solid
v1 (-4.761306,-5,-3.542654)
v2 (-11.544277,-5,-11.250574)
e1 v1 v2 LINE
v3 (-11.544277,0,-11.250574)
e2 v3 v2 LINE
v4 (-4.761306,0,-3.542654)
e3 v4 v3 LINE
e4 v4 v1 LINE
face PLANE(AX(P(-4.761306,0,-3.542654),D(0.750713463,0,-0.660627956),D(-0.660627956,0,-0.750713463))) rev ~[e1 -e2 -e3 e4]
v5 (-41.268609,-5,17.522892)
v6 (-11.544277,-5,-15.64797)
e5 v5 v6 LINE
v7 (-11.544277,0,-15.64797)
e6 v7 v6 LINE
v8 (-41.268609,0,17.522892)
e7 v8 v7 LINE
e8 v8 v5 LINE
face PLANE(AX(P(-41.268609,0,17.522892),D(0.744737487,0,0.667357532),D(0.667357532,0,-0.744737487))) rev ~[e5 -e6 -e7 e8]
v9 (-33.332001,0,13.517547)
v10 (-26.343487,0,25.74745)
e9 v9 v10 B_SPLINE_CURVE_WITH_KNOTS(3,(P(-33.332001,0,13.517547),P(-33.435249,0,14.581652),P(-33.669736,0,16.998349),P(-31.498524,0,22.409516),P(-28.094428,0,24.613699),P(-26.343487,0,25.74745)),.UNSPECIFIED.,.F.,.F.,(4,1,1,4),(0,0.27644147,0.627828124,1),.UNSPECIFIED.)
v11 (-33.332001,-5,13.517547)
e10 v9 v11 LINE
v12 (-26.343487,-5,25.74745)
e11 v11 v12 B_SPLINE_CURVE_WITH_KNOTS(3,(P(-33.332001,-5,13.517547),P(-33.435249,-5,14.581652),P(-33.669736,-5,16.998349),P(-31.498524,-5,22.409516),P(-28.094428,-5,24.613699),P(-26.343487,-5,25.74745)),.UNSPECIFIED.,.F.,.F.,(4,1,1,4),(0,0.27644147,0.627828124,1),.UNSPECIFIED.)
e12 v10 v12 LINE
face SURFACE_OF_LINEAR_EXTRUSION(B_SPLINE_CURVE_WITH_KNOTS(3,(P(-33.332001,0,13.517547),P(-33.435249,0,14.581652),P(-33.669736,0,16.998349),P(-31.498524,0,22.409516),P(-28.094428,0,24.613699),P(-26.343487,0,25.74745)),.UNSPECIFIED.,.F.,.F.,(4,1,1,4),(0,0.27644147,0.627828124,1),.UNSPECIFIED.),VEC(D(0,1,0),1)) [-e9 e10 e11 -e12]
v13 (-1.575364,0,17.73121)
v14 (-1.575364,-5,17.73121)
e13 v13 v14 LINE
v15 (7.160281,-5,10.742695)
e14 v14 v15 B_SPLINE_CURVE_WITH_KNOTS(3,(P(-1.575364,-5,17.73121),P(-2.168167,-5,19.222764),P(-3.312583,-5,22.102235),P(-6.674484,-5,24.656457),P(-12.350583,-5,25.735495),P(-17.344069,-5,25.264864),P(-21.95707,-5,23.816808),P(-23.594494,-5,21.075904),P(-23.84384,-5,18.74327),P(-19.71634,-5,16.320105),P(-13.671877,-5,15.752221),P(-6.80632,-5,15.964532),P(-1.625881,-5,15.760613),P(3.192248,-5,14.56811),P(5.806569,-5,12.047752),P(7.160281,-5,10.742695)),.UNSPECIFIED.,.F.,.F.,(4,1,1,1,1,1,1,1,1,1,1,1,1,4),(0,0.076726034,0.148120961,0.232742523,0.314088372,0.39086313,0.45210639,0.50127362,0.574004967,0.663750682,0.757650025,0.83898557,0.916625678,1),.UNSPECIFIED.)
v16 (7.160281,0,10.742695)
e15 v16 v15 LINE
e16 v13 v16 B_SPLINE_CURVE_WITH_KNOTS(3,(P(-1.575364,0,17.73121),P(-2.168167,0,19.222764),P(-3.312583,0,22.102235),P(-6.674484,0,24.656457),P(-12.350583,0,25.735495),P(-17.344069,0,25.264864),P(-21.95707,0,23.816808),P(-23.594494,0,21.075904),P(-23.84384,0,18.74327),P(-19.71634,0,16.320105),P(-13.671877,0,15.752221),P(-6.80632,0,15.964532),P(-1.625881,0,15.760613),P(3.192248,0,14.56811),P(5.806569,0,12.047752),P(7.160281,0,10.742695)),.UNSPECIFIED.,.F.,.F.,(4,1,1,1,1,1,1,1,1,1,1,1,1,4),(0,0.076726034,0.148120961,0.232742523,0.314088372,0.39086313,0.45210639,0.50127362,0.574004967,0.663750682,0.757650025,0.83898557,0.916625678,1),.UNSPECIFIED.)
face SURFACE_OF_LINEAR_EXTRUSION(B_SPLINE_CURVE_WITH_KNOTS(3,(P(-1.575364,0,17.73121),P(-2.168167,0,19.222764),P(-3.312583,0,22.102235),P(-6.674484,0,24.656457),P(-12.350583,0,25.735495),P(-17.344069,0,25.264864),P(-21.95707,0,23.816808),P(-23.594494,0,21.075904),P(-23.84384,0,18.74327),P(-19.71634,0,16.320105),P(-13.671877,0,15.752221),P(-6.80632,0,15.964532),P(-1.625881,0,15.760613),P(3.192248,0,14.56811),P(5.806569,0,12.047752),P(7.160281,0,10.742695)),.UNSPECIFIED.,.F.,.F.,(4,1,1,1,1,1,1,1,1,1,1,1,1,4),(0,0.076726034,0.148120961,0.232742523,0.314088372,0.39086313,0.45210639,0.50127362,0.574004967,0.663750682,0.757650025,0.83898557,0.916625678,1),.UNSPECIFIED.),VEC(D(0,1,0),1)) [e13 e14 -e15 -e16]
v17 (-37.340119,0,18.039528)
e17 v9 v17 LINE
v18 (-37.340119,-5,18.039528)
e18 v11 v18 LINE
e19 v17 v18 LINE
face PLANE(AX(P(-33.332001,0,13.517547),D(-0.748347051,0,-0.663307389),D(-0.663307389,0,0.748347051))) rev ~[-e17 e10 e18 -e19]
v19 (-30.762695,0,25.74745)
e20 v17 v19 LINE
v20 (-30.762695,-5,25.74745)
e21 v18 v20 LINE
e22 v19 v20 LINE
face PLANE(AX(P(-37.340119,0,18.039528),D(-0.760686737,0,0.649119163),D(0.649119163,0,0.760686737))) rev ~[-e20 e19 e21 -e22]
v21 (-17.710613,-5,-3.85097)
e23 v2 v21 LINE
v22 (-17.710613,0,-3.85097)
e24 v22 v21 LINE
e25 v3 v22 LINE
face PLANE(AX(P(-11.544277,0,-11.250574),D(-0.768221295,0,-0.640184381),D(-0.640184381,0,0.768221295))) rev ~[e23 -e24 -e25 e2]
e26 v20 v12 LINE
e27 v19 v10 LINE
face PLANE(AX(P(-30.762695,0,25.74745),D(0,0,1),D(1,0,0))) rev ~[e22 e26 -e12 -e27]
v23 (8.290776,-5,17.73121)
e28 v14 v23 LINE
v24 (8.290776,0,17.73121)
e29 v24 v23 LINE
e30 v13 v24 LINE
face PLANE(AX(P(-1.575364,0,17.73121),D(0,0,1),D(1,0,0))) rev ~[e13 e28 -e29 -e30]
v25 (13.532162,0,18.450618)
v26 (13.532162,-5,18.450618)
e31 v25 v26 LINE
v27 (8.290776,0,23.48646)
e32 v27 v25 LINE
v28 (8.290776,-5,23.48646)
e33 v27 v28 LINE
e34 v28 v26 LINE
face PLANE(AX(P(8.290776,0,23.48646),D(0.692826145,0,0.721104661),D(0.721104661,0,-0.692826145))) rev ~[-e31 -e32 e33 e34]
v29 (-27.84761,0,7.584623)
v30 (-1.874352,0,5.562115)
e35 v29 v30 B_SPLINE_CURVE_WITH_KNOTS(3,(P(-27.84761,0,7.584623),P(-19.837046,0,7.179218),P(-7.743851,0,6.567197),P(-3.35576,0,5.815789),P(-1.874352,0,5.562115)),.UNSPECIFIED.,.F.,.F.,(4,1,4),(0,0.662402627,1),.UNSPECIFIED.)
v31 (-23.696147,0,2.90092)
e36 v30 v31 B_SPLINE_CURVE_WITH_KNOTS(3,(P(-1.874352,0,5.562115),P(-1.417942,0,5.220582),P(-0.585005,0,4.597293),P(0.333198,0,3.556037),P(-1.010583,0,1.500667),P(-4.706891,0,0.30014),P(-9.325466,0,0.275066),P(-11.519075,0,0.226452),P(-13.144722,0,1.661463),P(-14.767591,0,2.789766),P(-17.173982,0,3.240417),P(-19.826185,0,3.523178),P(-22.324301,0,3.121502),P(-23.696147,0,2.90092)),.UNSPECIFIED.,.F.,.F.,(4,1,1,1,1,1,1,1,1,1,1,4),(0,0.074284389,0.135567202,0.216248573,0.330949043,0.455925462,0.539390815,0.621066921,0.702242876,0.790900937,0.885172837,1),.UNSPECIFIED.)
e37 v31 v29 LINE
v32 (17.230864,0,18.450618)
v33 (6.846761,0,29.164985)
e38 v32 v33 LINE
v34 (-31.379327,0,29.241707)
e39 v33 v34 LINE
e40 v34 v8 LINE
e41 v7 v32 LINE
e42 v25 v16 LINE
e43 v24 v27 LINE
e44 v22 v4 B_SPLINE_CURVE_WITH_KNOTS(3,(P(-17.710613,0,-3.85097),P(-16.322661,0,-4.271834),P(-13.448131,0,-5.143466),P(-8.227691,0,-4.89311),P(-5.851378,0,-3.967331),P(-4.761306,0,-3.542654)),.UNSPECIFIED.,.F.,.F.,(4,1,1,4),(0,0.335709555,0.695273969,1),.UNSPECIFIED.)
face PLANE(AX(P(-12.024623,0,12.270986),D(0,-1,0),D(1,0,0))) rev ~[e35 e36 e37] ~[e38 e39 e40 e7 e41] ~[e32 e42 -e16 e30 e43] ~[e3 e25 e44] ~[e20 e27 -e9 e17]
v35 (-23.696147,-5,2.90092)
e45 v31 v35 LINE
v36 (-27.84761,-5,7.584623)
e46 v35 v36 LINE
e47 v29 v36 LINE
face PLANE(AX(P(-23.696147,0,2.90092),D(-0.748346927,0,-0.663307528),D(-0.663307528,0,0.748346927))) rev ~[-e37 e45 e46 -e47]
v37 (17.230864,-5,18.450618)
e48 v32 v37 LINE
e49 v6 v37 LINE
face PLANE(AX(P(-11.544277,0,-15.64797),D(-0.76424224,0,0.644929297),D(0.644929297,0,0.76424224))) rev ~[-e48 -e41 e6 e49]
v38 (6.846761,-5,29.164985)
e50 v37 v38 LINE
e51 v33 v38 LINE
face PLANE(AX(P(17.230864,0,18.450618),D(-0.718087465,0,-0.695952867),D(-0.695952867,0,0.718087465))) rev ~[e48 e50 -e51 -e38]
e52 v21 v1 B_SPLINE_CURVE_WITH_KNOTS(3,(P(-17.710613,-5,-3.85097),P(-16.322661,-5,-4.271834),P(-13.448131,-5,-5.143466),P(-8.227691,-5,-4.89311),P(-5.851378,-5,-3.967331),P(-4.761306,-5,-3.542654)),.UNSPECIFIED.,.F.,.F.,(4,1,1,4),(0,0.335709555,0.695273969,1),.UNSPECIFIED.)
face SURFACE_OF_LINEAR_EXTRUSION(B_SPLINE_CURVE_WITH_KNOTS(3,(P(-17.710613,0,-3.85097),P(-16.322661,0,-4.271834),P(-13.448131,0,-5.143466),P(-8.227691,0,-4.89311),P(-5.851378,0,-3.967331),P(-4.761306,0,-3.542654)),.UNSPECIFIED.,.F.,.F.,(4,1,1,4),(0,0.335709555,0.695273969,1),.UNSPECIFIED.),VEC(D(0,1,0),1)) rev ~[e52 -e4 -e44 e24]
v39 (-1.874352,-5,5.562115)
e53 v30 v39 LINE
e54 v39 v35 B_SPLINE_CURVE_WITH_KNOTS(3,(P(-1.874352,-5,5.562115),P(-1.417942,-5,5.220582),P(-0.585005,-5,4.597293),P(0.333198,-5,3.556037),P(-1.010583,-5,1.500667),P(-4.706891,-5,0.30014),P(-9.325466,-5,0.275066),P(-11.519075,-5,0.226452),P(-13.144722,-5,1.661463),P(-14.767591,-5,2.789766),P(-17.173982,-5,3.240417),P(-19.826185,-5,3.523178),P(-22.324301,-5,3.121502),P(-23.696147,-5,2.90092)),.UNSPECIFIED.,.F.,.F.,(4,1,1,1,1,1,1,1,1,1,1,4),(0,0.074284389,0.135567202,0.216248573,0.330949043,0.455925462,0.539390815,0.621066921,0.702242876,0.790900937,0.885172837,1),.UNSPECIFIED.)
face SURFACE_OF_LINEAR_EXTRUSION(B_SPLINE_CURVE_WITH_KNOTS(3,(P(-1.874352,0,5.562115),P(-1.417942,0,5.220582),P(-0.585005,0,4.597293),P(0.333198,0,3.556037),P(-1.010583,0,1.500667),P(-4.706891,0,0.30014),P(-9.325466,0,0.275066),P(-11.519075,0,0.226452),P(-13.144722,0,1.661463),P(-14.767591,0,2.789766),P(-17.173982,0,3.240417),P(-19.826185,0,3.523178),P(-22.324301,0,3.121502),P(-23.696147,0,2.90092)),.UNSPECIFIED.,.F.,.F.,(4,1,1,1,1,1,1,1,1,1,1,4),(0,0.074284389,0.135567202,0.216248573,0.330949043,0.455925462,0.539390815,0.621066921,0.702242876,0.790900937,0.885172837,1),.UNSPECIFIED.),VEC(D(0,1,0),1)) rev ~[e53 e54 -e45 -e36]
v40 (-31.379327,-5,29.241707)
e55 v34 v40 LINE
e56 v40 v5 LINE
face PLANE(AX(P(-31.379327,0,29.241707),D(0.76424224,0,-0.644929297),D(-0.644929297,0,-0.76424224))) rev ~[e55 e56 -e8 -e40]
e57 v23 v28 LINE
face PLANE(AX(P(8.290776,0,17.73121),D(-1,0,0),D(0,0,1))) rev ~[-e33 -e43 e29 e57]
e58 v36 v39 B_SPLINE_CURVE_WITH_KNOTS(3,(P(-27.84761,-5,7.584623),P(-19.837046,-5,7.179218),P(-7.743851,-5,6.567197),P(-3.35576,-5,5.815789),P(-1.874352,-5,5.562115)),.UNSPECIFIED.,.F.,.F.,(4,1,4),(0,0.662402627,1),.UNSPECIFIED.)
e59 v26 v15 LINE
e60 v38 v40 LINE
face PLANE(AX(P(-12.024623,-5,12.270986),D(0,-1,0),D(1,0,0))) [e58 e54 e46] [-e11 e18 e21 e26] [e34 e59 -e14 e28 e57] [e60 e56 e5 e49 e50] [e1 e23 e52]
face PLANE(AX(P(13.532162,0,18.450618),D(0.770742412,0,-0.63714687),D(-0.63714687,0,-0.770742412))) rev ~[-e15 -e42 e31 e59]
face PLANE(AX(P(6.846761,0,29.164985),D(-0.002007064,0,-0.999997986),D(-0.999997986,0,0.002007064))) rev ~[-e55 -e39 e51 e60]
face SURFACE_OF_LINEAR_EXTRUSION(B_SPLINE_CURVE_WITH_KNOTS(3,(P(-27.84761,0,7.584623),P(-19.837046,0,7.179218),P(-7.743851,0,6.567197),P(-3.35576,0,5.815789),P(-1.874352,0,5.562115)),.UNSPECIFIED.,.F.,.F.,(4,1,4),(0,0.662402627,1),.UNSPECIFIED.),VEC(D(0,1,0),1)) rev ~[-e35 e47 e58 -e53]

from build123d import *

# Parameters (mm, degrees)
F1_DEPTH = 5


with BuildPart() as f1:
    # F0 (on Front) → F1 (new body)
    with BuildSketch(Plane.XZ):
        Polygon((6.8467608653, 29.1649848223), (-31.379327178, 29.241707176), (-41.2686094642, 17.5228919834), (-11.5442769602, -15.64797014), (17.2308642175, 18.4506177902), align=None)
        with BuildLine():
            Line((-23.6961469054, 2.9009203427), (-27.847610414, 7.5846225955))
            add(Edge.make_bspline(
                [(-27.847610414, 7.5846225955), (-19.8370461585, 7.1792182284), (-7.743850984, 6.5671971549), (-3.3557602446, 5.8157885618), (-1.8743523397, 5.562114995)],
                knots=[0, 0, 0, 0, 0.6624026273, 1, 1, 1, 1], degree=3))
            add(Edge.make_bspline(
                [(-1.8743523397, 5.562114995), (-1.4179422708, 5.2205821712), (-0.585004998, 4.5972930761), (0.3331977784, 3.5560373112), (-1.010582746, 1.5006672697), (-4.7068912366, 0.3001401954), (-9.3254664772, 0.2750656567), (-11.5190753977, 0.2264516302), (-13.1447218731, 1.6614626896), (-14.7675912552, 2.7897659842), (-17.1739824037, 3.2404166307), (-19.8261847392, 3.523178168), (-22.3243012801, 3.1215017434), (-23.6961469054, 2.9009203427)],
                knots=[0, 0, 0, 0, 0.0742843887, 0.1355672023, 0.2162485732, 0.3309490429, 0.4559254615, 0.5393908146, 0.6210669212, 0.7022428758, 0.790900937, 0.8851728372, 1, 1, 1, 1], degree=3))
        make_face(mode=Mode.SUBTRACT)
        with BuildLine():
            Line((-11.5442769602, -11.2505741417), (-17.7106130868, -3.8509704173))
            add(Edge.make_bspline(
                [(-17.7106130868, -3.8509704173), (-16.3226608848, -4.2718337351), (-13.4481313377, -5.1434660871), (-8.2276905085, -4.8931100883), (-5.8513779321, -3.9673311063), (-4.7613061033, -3.5426539835)],
                knots=[0, 0, 0, 0, 0.3357095554, 0.695273969, 1, 1, 1, 1], degree=3))
            Line((-4.7613061033, -3.5426539835), (-11.5442769602, -11.2505741417))
        make_face(mode=Mode.SUBTRACT)
        with BuildLine():
            Line((-37.3401194811, 18.0395282805), (-30.7626947761, 25.7474500686))
            Line((-30.7626947761, 25.7474500686), (-26.3434872031, 25.7474500686))
            add(Edge.make_bspline(
                [(-33.3320014179, 13.5175473988), (-33.4352493357, 14.5816524239), (-33.6697363916, 16.998348661), (-31.4985236243, 22.4095155368), (-28.0944284632, 24.6136991466), (-26.3434872031, 25.7474500686)],
                knots=[0, 0, 0, 0, 0.2764414704, 0.6278281236, 1, 1, 1, 1], degree=3))
            Line((-33.3320014179, 13.5175473988), (-37.3401194811, 18.0395282805))
        make_face(mode=Mode.SUBTRACT)
        with BuildLine():
            Line((8.2907760516, 17.7312102169), (8.2907760516, 23.4864596277))
            Line((8.2907760516, 23.4864596277), (13.5321617126, 18.4506177902))
            Line((13.5321617126, 18.4506177902), (7.1602808312, 10.7426950708))
            add(Edge.make_bspline(
                [(-1.5753639163, 17.7312102169), (-2.1681666347, 19.2227640195), (-3.3125827283, 22.1022349186), (-6.6744835027, 24.6564570993), (-12.3505834457, 25.7354953948), (-17.3440689805, 25.2648643198), (-21.9570699991, 23.8168081138), (-23.5944944017, 21.0759037774), (-23.8438395799, 18.743270129), (-19.7163395181, 16.3201047984), (-13.6718770191, 15.7522211208), (-6.8063195481, 15.9645316546), (-1.6258813787, 15.7606132749), (3.1922483306, 14.5681097618), (5.8065686961, 12.0477524987), (7.1602808312, 10.7426950708)],
                knots=[0, 0, 0, 0, 0.0767260342, 0.1481209611, 0.2327425226, 0.3140883717, 0.3908631304, 0.4521063897, 0.5012736199, 0.5740049671, 0.6637506815, 0.7576500248, 0.8389855697, 0.9166256779, 1, 1, 1, 1], degree=3))
            Line((-1.5753639163, 17.7312102169), (8.2907760516, 17.7312102169))
        make_face(mode=Mode.SUBTRACT)
    extrude(amount=F1_DEPTH)


solid = f1.part
